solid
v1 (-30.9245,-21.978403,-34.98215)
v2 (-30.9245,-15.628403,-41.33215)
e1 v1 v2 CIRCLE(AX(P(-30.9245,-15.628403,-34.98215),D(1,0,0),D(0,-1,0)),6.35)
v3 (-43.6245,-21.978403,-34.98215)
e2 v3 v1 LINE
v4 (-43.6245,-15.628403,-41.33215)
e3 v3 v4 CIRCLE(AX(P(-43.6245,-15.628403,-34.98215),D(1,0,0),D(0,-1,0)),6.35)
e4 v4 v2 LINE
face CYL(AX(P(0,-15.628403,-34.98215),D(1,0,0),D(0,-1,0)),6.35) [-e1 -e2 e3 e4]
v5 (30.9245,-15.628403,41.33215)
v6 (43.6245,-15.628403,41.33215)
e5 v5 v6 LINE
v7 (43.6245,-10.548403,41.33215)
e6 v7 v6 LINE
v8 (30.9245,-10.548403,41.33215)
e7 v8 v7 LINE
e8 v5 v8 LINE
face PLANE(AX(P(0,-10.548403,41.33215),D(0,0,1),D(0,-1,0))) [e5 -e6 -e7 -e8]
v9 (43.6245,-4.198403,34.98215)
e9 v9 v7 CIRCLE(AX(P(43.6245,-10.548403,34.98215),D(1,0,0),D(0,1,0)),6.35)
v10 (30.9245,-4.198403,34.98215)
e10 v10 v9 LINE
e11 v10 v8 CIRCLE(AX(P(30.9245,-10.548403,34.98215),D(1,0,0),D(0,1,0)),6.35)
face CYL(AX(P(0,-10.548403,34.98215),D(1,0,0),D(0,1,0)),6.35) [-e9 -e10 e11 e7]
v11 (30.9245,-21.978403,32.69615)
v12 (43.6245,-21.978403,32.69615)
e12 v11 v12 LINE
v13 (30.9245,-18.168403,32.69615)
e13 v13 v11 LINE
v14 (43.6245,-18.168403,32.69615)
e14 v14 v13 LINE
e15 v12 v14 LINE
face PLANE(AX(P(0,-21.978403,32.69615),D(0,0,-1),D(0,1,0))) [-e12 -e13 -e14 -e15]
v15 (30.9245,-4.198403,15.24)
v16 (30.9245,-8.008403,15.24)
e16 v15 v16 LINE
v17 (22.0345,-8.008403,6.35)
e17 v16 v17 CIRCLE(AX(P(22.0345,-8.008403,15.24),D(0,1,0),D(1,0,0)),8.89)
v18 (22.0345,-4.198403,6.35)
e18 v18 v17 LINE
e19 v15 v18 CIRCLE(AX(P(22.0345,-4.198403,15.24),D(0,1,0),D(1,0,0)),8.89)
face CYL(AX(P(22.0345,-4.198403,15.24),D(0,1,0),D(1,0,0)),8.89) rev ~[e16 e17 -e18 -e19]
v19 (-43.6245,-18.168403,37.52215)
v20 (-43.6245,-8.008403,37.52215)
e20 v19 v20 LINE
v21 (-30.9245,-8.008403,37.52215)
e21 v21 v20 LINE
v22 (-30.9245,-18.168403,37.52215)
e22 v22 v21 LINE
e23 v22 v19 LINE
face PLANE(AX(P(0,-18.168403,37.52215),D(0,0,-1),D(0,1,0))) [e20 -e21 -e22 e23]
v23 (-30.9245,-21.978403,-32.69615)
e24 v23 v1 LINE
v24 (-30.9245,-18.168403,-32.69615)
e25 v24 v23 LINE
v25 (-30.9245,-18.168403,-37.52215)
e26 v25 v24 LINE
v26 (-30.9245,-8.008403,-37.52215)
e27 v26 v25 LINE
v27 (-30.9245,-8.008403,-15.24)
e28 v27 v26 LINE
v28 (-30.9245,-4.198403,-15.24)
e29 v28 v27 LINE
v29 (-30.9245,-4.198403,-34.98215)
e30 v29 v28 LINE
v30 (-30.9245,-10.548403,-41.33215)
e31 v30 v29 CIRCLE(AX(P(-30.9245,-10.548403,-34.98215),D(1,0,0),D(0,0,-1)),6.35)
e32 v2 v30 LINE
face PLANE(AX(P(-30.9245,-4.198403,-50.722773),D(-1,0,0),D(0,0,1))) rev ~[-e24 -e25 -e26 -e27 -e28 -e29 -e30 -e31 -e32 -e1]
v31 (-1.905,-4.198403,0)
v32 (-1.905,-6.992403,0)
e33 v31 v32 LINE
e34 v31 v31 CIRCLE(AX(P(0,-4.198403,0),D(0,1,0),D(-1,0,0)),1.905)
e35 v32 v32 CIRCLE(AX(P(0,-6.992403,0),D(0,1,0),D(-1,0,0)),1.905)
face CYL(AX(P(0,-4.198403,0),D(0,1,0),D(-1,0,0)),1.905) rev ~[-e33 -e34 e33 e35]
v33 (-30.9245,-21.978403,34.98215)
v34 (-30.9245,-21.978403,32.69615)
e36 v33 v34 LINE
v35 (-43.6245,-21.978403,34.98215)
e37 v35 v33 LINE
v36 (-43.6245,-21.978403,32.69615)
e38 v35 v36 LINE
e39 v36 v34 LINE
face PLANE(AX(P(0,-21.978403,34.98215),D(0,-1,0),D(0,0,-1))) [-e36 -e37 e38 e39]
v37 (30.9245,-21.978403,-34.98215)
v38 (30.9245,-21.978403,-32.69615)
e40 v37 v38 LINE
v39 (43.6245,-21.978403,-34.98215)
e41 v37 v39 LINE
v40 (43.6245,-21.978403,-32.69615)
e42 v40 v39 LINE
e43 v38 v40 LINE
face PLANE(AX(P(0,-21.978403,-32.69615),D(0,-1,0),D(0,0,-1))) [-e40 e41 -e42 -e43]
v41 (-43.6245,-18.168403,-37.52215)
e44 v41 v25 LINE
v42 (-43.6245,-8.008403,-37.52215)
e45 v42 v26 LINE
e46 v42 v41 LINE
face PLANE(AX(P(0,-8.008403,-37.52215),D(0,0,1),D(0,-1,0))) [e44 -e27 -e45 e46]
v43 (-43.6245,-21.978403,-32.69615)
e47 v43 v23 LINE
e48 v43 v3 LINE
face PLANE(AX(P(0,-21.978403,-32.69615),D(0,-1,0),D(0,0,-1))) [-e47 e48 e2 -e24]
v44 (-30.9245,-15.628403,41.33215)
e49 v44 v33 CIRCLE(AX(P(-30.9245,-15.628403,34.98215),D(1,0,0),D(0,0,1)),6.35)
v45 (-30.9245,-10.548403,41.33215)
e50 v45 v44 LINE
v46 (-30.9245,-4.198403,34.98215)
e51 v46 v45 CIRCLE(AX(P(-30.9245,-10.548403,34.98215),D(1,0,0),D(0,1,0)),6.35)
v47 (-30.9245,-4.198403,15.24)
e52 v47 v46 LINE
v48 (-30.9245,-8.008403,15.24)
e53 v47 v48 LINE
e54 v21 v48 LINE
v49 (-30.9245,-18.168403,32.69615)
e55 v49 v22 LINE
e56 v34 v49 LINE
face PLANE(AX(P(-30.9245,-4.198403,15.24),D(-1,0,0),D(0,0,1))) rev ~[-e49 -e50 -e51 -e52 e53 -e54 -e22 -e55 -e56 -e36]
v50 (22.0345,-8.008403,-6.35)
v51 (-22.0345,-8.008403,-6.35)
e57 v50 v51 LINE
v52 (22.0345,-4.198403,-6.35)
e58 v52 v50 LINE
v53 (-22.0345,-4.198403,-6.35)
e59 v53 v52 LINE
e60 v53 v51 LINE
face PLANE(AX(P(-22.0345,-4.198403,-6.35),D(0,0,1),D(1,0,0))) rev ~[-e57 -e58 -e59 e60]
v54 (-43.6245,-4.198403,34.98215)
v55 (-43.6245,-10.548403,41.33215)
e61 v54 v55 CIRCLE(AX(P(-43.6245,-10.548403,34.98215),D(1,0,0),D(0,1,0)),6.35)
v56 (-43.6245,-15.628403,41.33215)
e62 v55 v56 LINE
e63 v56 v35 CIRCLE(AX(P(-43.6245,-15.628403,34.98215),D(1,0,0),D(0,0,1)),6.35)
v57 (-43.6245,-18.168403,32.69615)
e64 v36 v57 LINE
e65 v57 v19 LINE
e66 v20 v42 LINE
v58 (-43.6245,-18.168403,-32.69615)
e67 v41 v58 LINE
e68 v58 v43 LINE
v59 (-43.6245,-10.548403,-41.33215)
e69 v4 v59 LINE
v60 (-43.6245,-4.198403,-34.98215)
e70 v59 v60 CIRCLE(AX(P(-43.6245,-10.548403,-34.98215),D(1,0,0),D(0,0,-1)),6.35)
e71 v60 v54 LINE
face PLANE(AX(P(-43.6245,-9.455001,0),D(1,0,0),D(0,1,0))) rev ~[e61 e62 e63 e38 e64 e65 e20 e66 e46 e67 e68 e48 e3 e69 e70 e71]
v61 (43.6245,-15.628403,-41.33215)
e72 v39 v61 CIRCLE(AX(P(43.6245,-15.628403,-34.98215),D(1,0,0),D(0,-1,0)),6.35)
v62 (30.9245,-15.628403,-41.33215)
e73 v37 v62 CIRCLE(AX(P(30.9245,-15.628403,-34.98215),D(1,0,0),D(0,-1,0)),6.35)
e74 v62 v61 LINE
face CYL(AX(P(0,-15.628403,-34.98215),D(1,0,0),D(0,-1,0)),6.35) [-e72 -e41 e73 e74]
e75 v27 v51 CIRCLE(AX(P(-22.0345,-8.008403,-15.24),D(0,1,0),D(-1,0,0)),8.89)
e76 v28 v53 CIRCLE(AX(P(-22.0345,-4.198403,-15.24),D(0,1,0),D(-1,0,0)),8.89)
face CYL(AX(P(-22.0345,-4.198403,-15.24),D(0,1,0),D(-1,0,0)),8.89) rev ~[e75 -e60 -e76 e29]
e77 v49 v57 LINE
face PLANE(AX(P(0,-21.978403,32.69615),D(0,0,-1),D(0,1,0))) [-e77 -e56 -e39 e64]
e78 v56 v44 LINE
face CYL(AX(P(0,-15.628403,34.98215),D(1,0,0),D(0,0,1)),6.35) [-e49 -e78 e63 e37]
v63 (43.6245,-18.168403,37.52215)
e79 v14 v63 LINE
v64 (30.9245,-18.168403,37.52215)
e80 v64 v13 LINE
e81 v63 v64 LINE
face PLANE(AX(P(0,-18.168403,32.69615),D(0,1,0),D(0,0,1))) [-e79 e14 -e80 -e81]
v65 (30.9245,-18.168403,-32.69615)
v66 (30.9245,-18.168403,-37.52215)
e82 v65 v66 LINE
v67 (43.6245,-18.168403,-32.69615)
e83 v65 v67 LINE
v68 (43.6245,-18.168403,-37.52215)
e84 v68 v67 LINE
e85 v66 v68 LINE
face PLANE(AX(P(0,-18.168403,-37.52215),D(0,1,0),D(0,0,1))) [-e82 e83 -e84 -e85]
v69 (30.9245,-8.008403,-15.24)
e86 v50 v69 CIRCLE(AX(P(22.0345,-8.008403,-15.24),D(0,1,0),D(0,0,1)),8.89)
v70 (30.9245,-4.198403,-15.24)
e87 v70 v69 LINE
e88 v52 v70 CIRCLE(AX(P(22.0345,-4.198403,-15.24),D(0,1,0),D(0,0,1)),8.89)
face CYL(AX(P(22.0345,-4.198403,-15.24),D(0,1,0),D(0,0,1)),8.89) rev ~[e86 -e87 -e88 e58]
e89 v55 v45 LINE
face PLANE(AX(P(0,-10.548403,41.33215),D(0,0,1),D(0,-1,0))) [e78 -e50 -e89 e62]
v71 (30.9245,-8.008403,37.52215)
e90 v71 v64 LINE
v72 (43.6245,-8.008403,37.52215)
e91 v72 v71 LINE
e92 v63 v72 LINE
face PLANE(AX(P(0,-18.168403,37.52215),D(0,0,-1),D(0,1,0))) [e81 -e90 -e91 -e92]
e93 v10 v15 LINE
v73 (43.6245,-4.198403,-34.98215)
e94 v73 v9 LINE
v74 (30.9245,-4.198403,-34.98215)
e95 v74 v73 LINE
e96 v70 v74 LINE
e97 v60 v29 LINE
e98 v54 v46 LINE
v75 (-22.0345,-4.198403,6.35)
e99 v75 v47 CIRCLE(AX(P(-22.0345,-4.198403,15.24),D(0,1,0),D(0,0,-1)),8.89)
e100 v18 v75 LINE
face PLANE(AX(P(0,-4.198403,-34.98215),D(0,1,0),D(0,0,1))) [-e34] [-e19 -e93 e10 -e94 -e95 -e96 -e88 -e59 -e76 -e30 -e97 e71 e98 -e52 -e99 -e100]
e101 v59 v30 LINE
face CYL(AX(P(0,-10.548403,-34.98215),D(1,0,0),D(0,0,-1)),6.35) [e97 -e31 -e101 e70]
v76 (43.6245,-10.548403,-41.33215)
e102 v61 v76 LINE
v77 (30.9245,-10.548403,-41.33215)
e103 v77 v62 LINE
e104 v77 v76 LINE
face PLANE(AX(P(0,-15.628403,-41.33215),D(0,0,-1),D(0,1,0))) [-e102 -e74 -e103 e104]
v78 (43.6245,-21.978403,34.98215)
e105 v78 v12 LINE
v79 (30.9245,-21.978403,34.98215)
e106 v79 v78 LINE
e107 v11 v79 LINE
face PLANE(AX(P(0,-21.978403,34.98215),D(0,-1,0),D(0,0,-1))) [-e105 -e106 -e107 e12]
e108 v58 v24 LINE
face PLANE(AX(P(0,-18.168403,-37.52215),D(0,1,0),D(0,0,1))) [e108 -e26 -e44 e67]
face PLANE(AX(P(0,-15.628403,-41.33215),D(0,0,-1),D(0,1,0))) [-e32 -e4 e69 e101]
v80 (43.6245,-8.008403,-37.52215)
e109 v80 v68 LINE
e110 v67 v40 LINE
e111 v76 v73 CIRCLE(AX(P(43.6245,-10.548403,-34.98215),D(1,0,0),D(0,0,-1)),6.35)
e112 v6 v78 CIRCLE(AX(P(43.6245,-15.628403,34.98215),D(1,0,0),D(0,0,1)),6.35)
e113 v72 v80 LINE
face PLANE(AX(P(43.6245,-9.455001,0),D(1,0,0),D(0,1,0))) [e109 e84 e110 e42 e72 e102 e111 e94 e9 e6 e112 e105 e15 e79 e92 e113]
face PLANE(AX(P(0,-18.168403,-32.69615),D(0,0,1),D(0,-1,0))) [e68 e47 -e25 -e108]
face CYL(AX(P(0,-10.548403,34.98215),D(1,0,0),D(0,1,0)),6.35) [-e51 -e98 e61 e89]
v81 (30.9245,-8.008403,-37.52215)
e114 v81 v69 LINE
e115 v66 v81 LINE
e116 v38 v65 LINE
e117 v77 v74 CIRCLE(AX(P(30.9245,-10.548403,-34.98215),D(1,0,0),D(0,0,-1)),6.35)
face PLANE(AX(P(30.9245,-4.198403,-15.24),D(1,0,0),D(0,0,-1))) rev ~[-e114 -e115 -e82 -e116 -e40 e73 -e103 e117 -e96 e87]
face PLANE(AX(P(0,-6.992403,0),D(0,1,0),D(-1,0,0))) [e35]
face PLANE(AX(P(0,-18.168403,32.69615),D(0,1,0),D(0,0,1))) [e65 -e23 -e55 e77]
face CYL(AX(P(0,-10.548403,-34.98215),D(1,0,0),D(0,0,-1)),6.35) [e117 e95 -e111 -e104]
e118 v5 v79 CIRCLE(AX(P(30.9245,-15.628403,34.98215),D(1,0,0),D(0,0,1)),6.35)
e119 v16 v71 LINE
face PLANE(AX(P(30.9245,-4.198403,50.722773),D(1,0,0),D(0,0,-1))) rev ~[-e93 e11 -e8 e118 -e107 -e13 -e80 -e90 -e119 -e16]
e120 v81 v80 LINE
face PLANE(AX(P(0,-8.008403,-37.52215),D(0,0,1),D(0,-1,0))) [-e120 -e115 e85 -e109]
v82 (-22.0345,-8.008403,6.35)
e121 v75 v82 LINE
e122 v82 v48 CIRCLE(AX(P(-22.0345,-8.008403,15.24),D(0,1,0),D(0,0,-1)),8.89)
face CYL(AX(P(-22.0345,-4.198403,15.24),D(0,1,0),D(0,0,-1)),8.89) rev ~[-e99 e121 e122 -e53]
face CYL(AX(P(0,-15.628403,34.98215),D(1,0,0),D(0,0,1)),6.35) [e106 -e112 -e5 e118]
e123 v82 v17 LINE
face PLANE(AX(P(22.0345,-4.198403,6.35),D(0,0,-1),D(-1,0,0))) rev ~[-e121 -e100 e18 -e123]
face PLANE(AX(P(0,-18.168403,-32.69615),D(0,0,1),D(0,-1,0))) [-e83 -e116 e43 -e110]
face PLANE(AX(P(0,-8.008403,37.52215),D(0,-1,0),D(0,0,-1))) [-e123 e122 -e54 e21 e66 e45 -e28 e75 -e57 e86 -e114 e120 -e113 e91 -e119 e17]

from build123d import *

# Parameters (mm, degrees)
F1_DEPTH      = 43.6245
F1_DEPTH_BACK = 43.6245
F2_R          = 1.905
F3_DEPTH      = 2.794
F5_DEPTH      = 25.4


# Not quite as in the source:
# - a length typed as a fraction of an inch, garbled in the dataset ("3 / 203.2 mm" for 3/8 in), is restored


with BuildPart() as f1:
    # F0 (on Right) → F1 (new body, two sides)
    with BuildSketch(Plane.YZ) as f1_sk:
        with BuildLine():
            Line((-8.008403407, 37.52215), (-8.008403407, 0))
            Line((-8.008403407, 0), (-8.008403407, -37.52215))
            Line((-8.008403407, -37.52215), (-18.168403407, -37.52215))
            Line((-18.168403407, -37.52215), (-18.168403407, -32.69615))
            Line((-18.168403407, -32.69615), (-21.978403407, -32.69615))
            Line((-21.978403407, -32.69615), (-21.978403407, -34.98215))
            ThreePointArc((-21.978403407, -34.98215), (-20.1185314675, -39.4722780605), (-15.628403407, -41.33215))
            Line((-15.628403407, -41.33215), (-10.548403407, -41.33215))
            ThreePointArc((-10.548403407, -41.33215), (-6.0582753465, -39.4722780605), (-4.198403407, -34.98215))
            Line((-4.198403407, -34.98215), (-4.198403407, 0))
            Line((-4.198403407, 0), (-4.198403407, 34.98215))
            ThreePointArc((-4.198403407, 34.98215), (-6.0582753465, 39.4722780605), (-10.548403407, 41.33215))
            Line((-10.548403407, 41.33215), (-15.628403407, 41.33215))
            ThreePointArc((-15.628403407, 41.33215), (-20.1185314675, 39.4722780605), (-21.978403407, 34.98215))
            Line((-21.978403407, 34.98215), (-21.978403407, 32.69615))
            Line((-21.978403407, 32.69615), (-18.168403407, 32.69615))
            Line((-18.168403407, 32.69615), (-18.168403407, 37.52215))
            Line((-18.168403407, 37.52215), (-8.008403407, 37.52215))
        make_face()
    extrude(amount=F1_DEPTH)
    extrude(f1_sk.sketch, amount=-F1_DEPTH_BACK)

    # F2 (on face) → F3 (cut)
    with BuildSketch(Plane(origin=(0, -4.198403407, 0), x_dir=(-1, 0, 0), z_dir=(0, 1, 0))):
        Circle(F2_R)
    extrude(amount=-F3_DEPTH, mode=Mode.SUBTRACT)

    # F4 (on face) → F5 (cut)
    with BuildSketch(Plane(origin=(0, -4.198403407, 0), x_dir=(-1, 0, 0), z_dir=(0, 1, 0))):
        with BuildLine():
            Line((-22.0345, 6.35), (22.0345, 6.35))
            ThreePointArc((22.0345, 6.35), (28.3206792847, 8.9538207153), (30.9245, 15.24))
            Line((30.9245, 15.24), (30.9245, 50.7227726401))
            Line((30.9245, 50.7227726401), (-30.9245, 50.7227726401))
            Line((-30.9245, 50.7227726401), (-30.9245, 15.24))
            ThreePointArc((-30.9245, 15.24), (-28.3206792847, 8.9538207153), (-22.0345, 6.35))
        make_face()
        with BuildLine():
            ThreePointArc((30.9245, -15.24), (28.3206792847, -8.9538207153), (22.0345, -6.35))
            Line((22.0345, -6.35), (-22.0345, -6.35))
            ThreePointArc((-22.0345, -6.35), (-28.3206792847, -8.9538207153), (-30.9245, -15.24))
            Line((-30.9245, -15.24), (-30.9245, -50.7227726401))
            Line((-30.9245, -50.7227726401), (30.9245, -50.7227726401))
            Line((30.9245, -50.7227726401), (30.9245, -15.24))
        make_face()
    extrude(amount=-F5_DEPTH, mode=Mode.SUBTRACT)


solid = f1.part
